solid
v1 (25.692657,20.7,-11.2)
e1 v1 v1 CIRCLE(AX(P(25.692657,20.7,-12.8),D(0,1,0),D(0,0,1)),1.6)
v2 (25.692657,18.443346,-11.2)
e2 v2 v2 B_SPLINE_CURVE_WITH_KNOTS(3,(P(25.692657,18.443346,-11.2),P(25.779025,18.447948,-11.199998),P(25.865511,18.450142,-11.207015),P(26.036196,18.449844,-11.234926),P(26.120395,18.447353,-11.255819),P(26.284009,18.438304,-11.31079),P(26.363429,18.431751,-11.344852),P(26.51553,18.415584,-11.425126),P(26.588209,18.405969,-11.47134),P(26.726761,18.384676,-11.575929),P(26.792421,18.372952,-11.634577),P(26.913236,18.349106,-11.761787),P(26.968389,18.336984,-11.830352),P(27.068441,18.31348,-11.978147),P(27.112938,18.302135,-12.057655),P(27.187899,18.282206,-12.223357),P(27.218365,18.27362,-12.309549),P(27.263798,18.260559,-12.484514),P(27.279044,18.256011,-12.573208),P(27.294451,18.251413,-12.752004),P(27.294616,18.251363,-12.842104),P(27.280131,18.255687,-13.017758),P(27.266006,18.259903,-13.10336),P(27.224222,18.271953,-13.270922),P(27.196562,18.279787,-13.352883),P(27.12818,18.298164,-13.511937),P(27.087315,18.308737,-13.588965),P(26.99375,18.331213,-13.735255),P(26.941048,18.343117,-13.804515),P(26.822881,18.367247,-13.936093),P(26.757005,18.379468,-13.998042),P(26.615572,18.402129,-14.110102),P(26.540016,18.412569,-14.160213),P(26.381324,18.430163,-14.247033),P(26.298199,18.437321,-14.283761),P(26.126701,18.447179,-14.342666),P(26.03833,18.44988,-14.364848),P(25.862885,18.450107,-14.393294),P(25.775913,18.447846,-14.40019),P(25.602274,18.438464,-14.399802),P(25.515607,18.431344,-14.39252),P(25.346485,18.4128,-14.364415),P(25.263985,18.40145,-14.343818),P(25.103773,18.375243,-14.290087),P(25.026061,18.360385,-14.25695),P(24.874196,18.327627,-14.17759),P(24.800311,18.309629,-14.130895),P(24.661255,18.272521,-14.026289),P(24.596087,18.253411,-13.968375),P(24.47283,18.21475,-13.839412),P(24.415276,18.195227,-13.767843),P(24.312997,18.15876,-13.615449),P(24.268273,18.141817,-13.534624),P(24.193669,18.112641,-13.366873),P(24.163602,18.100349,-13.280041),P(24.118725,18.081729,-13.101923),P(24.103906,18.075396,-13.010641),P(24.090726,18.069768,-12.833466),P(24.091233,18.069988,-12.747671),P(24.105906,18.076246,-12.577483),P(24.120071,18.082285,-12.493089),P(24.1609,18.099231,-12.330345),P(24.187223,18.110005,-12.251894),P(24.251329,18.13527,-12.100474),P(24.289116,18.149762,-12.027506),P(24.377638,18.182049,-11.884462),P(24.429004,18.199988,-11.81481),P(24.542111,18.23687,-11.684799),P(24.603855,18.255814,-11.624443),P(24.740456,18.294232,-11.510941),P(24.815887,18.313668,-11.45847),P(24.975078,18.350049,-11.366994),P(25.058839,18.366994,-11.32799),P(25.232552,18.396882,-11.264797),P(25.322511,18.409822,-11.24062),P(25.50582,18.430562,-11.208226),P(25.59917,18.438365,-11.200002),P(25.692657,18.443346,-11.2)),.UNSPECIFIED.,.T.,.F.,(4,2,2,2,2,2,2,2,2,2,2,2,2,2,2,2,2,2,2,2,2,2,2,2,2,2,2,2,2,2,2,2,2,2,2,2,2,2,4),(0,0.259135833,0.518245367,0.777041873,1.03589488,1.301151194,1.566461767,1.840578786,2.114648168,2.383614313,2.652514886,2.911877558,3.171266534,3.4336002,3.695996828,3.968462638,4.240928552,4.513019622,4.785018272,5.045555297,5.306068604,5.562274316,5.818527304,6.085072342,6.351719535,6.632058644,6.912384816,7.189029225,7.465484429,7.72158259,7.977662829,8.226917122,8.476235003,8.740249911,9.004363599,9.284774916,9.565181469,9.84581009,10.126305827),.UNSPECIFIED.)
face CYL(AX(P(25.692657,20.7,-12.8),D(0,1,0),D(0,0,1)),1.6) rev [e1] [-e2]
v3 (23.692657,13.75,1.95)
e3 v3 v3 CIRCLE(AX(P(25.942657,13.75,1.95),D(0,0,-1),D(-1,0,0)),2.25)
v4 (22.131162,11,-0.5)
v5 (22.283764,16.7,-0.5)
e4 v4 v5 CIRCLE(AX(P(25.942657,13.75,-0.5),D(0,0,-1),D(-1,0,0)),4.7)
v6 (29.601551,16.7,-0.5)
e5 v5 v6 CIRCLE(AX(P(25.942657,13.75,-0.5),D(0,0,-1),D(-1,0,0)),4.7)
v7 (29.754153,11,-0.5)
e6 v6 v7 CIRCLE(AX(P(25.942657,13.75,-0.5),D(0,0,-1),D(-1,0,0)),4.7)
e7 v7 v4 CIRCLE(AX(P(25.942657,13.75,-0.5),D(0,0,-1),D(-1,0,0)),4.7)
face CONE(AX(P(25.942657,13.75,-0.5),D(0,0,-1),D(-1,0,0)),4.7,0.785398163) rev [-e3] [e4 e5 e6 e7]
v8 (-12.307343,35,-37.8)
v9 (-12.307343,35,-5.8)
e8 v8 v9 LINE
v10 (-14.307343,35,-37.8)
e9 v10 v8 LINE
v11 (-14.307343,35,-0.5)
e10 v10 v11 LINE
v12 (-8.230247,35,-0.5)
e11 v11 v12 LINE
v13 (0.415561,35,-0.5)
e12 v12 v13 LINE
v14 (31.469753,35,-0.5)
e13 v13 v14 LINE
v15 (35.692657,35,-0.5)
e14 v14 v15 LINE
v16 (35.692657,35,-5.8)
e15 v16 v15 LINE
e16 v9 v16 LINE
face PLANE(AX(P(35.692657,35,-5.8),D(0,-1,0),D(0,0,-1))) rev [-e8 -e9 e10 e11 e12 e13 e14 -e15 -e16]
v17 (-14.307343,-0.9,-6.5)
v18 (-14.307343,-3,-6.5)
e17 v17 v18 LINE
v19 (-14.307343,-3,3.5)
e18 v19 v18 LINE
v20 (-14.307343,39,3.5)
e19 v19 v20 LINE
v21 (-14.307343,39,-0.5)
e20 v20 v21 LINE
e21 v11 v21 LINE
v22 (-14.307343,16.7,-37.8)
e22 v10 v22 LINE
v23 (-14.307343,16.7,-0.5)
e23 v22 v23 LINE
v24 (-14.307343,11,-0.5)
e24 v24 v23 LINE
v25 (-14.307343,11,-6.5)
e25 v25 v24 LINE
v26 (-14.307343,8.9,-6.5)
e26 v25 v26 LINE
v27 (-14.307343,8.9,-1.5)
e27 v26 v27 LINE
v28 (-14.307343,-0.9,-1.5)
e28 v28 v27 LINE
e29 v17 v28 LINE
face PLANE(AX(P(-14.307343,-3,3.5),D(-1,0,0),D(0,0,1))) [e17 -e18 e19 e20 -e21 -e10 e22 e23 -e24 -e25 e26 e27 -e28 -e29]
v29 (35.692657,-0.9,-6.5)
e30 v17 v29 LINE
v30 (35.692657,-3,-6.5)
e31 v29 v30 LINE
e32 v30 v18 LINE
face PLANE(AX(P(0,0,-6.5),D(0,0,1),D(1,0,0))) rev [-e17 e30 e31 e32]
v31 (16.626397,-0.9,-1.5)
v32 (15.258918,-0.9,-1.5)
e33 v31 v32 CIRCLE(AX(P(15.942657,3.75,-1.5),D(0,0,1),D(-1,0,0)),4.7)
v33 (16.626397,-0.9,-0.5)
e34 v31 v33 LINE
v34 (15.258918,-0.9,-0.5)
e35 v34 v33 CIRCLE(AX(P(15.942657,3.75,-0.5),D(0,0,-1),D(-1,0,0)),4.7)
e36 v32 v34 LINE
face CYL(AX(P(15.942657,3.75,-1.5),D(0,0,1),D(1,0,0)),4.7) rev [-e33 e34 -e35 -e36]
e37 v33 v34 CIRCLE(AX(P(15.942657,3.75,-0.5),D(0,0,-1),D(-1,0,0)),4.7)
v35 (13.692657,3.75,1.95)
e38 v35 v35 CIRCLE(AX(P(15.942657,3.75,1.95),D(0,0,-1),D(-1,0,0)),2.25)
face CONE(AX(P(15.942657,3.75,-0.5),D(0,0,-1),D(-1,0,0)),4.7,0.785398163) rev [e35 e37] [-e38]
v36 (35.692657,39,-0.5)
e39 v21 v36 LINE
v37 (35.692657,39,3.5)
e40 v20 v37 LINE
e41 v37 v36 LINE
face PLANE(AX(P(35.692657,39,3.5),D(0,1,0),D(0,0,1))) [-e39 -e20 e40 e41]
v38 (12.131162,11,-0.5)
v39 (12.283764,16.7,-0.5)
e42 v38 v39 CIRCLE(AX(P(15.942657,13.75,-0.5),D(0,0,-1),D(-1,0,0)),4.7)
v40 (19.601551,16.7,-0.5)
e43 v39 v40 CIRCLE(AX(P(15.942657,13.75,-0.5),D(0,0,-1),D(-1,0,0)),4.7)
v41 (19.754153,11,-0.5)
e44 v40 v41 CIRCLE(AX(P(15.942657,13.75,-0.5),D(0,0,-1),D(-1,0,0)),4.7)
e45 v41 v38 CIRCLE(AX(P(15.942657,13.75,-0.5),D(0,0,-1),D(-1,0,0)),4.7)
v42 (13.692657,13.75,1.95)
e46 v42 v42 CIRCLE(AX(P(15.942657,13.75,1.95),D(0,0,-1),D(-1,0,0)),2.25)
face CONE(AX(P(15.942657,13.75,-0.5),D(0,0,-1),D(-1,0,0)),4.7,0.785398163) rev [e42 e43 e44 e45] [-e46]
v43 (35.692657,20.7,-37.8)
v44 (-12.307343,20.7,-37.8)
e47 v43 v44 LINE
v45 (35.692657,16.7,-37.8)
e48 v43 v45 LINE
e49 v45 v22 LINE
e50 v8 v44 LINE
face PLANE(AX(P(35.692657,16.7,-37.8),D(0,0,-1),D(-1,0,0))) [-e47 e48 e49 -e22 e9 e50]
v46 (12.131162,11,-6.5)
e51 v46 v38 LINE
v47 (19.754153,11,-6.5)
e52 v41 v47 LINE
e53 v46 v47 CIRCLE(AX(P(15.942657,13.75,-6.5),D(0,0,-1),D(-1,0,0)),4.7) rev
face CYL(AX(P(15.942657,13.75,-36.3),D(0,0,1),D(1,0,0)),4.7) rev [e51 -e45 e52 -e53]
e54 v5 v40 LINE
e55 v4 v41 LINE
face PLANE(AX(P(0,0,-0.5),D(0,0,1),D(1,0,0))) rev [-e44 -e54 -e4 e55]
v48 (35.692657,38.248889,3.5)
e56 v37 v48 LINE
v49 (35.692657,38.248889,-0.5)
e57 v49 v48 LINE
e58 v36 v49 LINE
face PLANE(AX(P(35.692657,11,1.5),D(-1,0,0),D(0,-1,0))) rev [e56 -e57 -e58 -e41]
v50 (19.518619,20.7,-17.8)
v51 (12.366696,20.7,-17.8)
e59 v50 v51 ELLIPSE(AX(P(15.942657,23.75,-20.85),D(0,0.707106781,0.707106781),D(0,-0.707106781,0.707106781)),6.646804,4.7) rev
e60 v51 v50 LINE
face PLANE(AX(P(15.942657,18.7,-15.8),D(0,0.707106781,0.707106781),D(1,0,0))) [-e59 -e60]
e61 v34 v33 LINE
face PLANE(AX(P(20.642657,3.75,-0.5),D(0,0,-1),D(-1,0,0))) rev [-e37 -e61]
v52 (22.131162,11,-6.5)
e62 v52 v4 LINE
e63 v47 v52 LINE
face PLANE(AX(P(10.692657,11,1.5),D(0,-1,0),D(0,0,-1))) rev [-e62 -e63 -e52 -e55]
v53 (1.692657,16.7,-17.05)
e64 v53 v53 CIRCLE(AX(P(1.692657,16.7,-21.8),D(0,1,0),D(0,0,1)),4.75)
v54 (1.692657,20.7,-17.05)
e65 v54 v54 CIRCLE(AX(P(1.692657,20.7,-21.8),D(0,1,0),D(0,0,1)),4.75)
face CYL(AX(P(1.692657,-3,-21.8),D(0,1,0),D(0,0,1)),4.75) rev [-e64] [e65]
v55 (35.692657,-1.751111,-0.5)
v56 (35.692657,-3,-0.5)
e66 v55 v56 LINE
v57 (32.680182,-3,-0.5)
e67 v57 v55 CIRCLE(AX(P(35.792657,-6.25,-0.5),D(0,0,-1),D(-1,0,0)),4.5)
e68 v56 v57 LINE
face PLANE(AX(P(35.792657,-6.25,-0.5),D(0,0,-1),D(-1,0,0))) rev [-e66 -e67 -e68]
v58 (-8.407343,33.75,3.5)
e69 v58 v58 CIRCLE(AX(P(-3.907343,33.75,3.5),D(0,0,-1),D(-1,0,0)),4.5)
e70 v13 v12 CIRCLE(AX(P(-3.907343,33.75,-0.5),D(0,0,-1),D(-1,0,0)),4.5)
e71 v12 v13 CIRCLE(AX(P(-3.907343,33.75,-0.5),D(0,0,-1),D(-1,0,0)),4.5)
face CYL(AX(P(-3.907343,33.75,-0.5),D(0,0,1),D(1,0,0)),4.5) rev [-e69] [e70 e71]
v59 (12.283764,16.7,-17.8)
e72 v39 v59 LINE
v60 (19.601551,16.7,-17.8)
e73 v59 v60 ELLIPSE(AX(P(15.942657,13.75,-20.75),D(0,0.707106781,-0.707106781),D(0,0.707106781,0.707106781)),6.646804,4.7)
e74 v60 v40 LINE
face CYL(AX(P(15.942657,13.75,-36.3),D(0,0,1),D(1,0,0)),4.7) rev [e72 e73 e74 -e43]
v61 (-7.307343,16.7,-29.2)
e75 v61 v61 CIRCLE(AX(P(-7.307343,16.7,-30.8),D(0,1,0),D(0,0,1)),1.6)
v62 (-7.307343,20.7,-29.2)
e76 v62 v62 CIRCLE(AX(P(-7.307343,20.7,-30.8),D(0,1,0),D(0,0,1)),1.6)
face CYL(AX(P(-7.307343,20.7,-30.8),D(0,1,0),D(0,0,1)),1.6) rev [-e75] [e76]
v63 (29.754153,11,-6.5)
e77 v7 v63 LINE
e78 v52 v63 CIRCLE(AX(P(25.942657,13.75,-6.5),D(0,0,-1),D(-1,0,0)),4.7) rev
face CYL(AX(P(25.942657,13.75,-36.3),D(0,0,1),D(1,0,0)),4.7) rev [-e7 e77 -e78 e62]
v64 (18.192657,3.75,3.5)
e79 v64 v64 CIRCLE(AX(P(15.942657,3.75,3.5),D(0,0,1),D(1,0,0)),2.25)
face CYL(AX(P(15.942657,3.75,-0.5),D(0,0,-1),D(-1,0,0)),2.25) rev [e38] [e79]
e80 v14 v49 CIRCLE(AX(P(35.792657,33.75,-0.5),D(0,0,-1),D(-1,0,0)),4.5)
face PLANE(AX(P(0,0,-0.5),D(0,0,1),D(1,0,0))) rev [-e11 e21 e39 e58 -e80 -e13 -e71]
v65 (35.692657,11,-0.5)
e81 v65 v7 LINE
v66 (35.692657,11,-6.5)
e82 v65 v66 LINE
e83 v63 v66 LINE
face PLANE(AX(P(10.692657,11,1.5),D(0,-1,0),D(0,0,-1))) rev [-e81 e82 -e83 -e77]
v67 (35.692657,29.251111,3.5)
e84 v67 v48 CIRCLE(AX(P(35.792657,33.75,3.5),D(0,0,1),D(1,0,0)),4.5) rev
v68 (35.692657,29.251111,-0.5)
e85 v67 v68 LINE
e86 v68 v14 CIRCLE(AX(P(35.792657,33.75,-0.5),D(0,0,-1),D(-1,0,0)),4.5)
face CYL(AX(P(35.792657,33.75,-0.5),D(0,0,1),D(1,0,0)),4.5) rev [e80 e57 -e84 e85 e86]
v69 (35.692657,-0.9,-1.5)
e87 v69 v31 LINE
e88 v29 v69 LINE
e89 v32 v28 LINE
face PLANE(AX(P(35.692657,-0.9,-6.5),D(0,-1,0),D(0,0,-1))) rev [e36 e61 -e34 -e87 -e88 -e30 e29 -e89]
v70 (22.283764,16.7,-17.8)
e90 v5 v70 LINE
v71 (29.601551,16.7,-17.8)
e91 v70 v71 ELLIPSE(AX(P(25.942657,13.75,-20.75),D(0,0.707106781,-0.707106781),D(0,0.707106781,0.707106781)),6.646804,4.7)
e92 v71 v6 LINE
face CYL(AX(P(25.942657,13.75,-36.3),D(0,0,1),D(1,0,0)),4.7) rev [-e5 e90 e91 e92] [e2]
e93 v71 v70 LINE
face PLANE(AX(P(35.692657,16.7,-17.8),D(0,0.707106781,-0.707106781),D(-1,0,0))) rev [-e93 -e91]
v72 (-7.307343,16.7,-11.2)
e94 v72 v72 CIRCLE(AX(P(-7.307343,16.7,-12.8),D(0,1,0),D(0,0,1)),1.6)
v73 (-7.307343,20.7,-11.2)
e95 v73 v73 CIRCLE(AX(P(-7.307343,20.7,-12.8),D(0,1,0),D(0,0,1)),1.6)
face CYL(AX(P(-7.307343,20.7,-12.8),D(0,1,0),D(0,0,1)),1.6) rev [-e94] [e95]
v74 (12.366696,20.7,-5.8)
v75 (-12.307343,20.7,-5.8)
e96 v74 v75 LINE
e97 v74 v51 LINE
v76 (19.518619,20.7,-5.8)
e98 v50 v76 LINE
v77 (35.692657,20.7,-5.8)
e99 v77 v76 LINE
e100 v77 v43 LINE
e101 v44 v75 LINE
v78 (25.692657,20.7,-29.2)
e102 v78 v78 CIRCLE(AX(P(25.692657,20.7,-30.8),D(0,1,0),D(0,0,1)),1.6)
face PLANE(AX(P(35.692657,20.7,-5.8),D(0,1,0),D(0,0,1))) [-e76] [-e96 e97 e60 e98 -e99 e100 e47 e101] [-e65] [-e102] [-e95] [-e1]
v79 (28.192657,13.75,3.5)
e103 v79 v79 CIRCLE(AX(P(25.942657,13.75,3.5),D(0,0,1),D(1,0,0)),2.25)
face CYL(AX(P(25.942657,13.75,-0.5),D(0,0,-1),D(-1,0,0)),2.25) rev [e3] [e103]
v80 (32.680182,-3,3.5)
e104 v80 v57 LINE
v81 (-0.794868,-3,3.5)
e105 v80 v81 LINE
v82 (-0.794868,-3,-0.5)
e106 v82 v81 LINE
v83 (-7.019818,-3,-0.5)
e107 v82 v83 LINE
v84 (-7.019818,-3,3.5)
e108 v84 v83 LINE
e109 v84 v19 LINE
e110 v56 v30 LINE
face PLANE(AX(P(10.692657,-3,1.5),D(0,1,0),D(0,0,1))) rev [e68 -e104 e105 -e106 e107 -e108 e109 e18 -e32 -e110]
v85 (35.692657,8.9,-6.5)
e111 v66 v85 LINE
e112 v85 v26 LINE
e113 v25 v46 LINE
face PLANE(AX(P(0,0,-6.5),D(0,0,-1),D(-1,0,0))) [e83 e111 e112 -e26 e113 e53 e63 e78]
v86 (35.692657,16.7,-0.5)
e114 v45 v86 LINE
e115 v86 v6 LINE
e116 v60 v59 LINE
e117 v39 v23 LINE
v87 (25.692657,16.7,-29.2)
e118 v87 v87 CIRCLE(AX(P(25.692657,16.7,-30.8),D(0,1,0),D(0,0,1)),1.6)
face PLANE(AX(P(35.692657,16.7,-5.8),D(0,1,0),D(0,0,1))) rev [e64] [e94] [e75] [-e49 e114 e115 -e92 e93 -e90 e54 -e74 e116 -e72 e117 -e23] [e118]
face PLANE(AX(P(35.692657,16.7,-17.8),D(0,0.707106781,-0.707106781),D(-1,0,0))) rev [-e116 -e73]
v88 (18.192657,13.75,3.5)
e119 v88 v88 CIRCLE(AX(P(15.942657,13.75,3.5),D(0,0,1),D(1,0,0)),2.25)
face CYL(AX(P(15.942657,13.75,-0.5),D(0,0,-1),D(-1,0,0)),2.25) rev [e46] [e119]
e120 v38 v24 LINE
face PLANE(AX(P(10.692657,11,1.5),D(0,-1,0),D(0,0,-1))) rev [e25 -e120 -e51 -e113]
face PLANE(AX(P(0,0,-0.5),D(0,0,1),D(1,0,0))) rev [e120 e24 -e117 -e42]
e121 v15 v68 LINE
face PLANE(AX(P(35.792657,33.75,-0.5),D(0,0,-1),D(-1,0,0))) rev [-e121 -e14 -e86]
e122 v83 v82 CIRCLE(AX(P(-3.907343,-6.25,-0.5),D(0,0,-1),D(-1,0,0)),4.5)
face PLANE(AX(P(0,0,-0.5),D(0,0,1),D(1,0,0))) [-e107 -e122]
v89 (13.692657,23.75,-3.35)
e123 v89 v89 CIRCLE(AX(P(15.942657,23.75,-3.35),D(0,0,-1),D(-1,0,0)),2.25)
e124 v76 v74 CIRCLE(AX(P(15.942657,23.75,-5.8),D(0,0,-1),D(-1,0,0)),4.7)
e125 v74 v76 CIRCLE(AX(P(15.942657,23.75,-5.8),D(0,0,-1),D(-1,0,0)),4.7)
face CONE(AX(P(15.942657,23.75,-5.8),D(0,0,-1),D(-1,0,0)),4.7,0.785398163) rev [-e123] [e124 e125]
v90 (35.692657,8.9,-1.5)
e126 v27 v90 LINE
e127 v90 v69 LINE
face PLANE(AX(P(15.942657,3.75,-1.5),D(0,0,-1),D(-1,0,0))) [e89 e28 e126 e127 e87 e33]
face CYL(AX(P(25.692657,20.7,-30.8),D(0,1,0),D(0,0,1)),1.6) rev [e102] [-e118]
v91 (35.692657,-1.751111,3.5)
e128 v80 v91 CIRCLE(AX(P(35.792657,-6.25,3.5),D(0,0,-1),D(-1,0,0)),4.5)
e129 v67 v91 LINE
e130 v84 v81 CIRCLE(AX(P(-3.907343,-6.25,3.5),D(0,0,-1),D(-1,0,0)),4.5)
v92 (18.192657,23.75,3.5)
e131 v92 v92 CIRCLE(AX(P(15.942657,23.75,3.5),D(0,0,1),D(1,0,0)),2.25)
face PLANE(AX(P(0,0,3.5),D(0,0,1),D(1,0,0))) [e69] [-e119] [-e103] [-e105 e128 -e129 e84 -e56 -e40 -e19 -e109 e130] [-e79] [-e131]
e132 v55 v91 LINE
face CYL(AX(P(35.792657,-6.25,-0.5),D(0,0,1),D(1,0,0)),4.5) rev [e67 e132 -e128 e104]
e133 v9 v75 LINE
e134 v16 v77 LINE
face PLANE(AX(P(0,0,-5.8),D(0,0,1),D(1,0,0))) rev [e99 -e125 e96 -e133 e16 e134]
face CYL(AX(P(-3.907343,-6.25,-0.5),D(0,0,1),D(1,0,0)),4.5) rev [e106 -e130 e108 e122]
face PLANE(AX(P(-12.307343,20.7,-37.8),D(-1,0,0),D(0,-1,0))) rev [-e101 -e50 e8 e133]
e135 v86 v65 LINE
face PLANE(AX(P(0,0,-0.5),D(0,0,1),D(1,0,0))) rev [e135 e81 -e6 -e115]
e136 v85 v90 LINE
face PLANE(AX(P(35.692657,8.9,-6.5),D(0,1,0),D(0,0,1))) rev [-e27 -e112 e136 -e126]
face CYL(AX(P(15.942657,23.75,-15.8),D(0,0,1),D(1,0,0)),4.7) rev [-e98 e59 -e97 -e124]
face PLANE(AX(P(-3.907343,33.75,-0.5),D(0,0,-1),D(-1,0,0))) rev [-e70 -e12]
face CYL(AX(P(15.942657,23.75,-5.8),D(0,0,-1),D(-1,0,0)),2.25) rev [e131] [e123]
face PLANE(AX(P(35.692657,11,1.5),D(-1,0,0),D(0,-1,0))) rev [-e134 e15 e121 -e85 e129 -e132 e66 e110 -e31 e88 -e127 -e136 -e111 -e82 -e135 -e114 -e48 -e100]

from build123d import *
from build123d.topology import SkipClean

# Parameters (mm, degrees)
BOSS_EXTRUDE1_START       = 0.5
SKETCH1_W                 = 25
SKETCH1_H                 = 14
BOSS_EXTRUDE1_DEPTH       = 2
SKETCH2_W                 = 25
SKETCH2_H                 = 2.1
BOSS_EXTRUDE2_DEPTH       = 6
SKETCH3_W                 = 50
SKETCH3_H                 = 42
BOSS_EXTRUDE3_DEPTH       = 4
BOSS_EXTRUDE5_START       = -18.3
SKETCH4_2_R               = 1.5
BOSS_EXTRUDE5_DEPTH       = 4
SKETCH5_W                 = 50
SKETCH5_H                 = 18.3
BOSS_EXTRUDE6_DEPTH       = 5.3
SKETCH7_R                 = 4.5
CUT_EXTRUDE1_DEPTH        = 4
SKETCH9_W                 = 35.343646405
SKETCH9_H                 = 8.813303651
CUT_EXTRUDE3_DEPTH        = 10
SKETCH11_R                = 12.5
SKETCH11_R_2              = 1.5
SKETCH11_R_3              = 3.55
BOSS_EXTRUDE7_DEPTH       = 4
SKETCH12_R                = 12.5
BOSS_EXTRUDE8_DEPTH       = 14
SKETCH13_W                = 25
SKETCH13_H                = 2.1
BOSS_EXTRUDE9_DEPTH       = 6
CUT_EXTRUDE2_DEPTH        = 64.84830294
SKETCH14_W                = 9.591087042
SKETCH14_H                = 22.957747356
CUT_EXTRUDE4_DEPTH        = 64.347816028
SKETCH15_W                = 33.975925545
SKETCH15_H                = 18.244219276
CUT_EXTRUDE5_DEPTH        = 62.391693358
SKETCH16_W                = 32
SKETCH16_H                = 4
BOSS_EXTRUDE10_DEPTH      = 50
SKETCH18_W                = 2
SKETCH18_H                = 14.3
BOSS_EXTRUDE11_DEPTH      = 32
CUT_EXTRUDE6_DEPTH        = 58.135766279
F_1_0MM_DOWEL_HOLE1_D     = 3.2
F_1_0MM_DOWEL_HOLE1_DEPTH = 33.03862301
F_1_0MM_DOWEL_HOLE1_TIP   = 0.96137699
BOSS_EXTRUDE12_DEPTH      = 1
CUT_EXTRUDE7_DEPTH        = 10
CHAMFER1_SIZE             = 2


# Read off the part's stored shape, not the designer's step: CSK for M4 Flat Head Machine Screw1
with BuildPart() as part:
    # Sketch1 → Boss-Extrude1 (new body)
    with BuildSketch(Plane.XY.offset(-1).offset(BOSS_EXTRUDE1_START)):
        with Locations((23.192657344, 4)):
            Rectangle(SKETCH1_W, SKETCH1_H)
    extrude(amount=BOSS_EXTRUDE1_DEPTH)

    # Sketch2 → Boss-Extrude2 (add)
    with BuildSketch(Plane(origin=(0, 0, -0.5), x_dir=(-1, 0, 0), z_dir=(0, 0, -1))):
        with Locations((-23.192657344, 9.95)):
            Rectangle(SKETCH2_W, SKETCH2_H)
        with Locations((-23.192657344, -1.95)):
            Rectangle(SKETCH2_W, SKETCH2_H)
    extrude(amount=BOSS_EXTRUDE2_DEPTH)

    # Sketch3 → Boss-Extrude3 (add)
    with BuildSketch(Plane(origin=(0, 0, -0.5), x_dir=(-1, 0, 0), z_dir=(0, 0, -1))):
        with Locations((-10.692657344, 18)):
            Rectangle(SKETCH3_W, SKETCH3_H)
    extrude(amount=-BOSS_EXTRUDE3_DEPTH)

    # Sketch4<2> → Boss-Extrude5 (add)
    with BuildSketch(Plane(origin=(0, 35, 0), x_dir=(1, 0, 0), z_dir=(0, 1, 0)).offset(BOSS_EXTRUDE5_START)):
        with BuildLine():
            Line((-1.349302764, 24.5), (-1.349302764, 0.5))
            Line((-1.349302764, 0.5), (8.650697236, 0.5))
            Line((8.650697236, 0.5), (8.650697236, 24.5))
            ThreePointArc((8.650697236, 24.5), (3.650697236, 29.5), (-1.349302764, 24.5))
        make_face()
        with Locations(Location((3.650697236, 7.5, 0), (0, 0, 270))):
            Circle(SKETCH4_2_R, mode=Mode.SUBTRACT)
        with Locations(Location((3.650697236, 24.5, 0), (0, 0, 270))):
            Circle(SKETCH4_2_R, mode=Mode.SUBTRACT)
    extrude(amount=-BOSS_EXTRUDE5_DEPTH)

    # Sketch5 → Boss-Extrude6 (add)
    with BuildSketch(Plane(origin=(0, 0, -0.5), x_dir=(-1, 0, 0), z_dir=(0, 0, -1))):
        with Locations((-10.692657344, 25.85)):
            Rectangle(SKETCH5_W, SKETCH5_H)
    extrude(amount=BOSS_EXTRUDE6_DEPTH)

    # CSK for M4 Flat Head Machine Screw1 outl → CSK for M4 Flat Head Machine Screw1 (revolve, cut)
    with BuildSketch(Plane(origin=(15.942657344, 23.75, 0), x_dir=(1, 0, 0), z_dir=(0, -1, 0))):
        Polygon((2.25, -3.35), (2.25, 3.5), (0, 3.5), (0, -5.8), (4.7, -5.8), align=None)
    revolve(axis=Axis((15.942657344, 23.75, 0), (0, 0, 1)), mode=Mode.SUBTRACT)

    # CSK for M4 Flat Head Machine Screw1 2 ou → CSK for M4 Flat Head Machine Screw1 2 (revolve, cut)
    with BuildSketch(Plane(origin=(15.942657344, 3.75, 0), x_dir=(1, 0, 0), z_dir=(0, -1, 0))):
        Polygon((4.7, -0.5), (2.25, 1.95), (2.25, 3.5), (0, 3.5), (0, -0.5), align=None)
    revolve(axis=Axis((15.942657344, 3.75, 0), (0, 0, 1)), mode=Mode.SUBTRACT)

    # CSK for M4 Flat Head Machine Screw1 3 ou → CSK for M4 Flat Head Machine Screw1 3 (revolve, cut)
    with BuildSketch(Plane(origin=(15.942657344, 13.75, 0), x_dir=(1, 0, 0), z_dir=(0, -1, 0))):
        Polygon((4.7, -0.5), (2.25, 1.95), (2.25, 3.5), (0, 3.5), (0, -0.5), align=None)
    revolve(axis=Axis((15.942657344, 13.75, 0), (0, 0, 1)), mode=Mode.SUBTRACT)

    # CSK for M4 Flat Head Machine Screw1 4 ou → CSK for M4 Flat Head Machine Screw1 4 (revolve, cut)
    with BuildSketch(Plane(origin=(25.942657344, 13.75, 0), x_dir=(1, 0, 0), z_dir=(0, -1, 0))):
        Polygon((2.25, 1.95), (2.25, 3.5), (0, 3.5), (0, -0.5), (4.7, -0.5), align=None)
    revolve(axis=Axis((25.942657344, 13.75, 0), (0, 0, 1)), mode=Mode.SUBTRACT)

    # Sketch7 → Cut-Extrude1 (cut)
    with BuildSketch(Plane(origin=(0, 0, 3.5), x_dir=(-1, 0, 0), z_dir=(0, 0, -1))):
        with Locations((-35.792657344, 33.75)):
            Circle(SKETCH7_R)
        with Locations(Location((3.907342656, 33.75, 0), (0, 0, 163.872379787))):
            Circle(SKETCH7_R)
        with Locations((3.907342656, -6.25)):
            Circle(SKETCH7_R)
        with Locations((-35.792657344, -6.25)):
            Circle(SKETCH7_R)
    extrude(amount=CUT_EXTRUDE1_DEPTH, mode=Mode.SUBTRACT)

    # Sketch9 → Cut-Extrude3 (cut)
    with BuildSketch(Plane.ZY.offset(1.349302764)):
        with Locations((-18.171823203, 12.293348175)):
            Rectangle(SKETCH9_W, SKETCH9_H)
    extrude(amount=-CUT_EXTRUDE3_DEPTH, mode=Mode.SUBTRACT)

    # Sketch11 → Boss-Extrude7 (add)
    # profile 1 of 4: a face of its own
    with BuildSketch(Plane.XZ.offset(-16.7)):
        with BuildLine():
            Line((-3.212467494, -5.8), (-14.307342656, -5.8))
            Line((-14.307342656, -5.8), (-14.807342656, -5.8))
            Line((-14.807342656, -5.8), (-14.807342656, -20.8))
            ThreePointArc((-14.807342656, -20.8), (-11.570691199, -11.320533638), (-3.212467494, -5.8))
        make_face()
    # profile 2 of 4: a face of its own
    with BuildSketch(Plane.XZ.offset(-16.7)):
        with BuildLine():
            Line((4.597782182, -5.8), (-3.212467494, -5.8))
            ThreePointArc((-3.212467494, -5.8), (-11.570691199, -11.320533638), (-14.807342656, -20.8))
            ThreePointArc((-14.807342656, -20.8), (0.692657344, -36.3), (16.192657344, -20.8))
            ThreePointArc((16.192657344, -20.8), (12.956005887, -11.320533638), (4.597782182, -5.8))
        make_face()
        with Locations((0.692657344, -20.8)):
            Circle(SKETCH11_R, mode=Mode.SUBTRACT)
    # profile 3 of 4: a face of its own
    with BuildSketch(Plane.XZ.offset(-16.7)):
        with Locations((0.692657344, -20.8)):
            Circle(SKETCH11_R)
        with Locations(Location((0.692657344, -12.3, 0), (0, 0, 270))):
            Circle(SKETCH11_R_2, mode=Mode.SUBTRACT)
        with Locations(Location((0.692657344, -20.8, 0), (0, 0, 270))):
            Circle(SKETCH11_R_3, mode=Mode.SUBTRACT)
        with Locations(Location((9.192657344, -20.8, 0), (0, 0, 270))):
            Circle(SKETCH11_R_2, mode=Mode.SUBTRACT)
        with Locations(Location((0.692657344, -29.3, 0), (0, 0, 270))):
            Circle(SKETCH11_R_2, mode=Mode.SUBTRACT)
        with Locations(Location((-7.807342656, -20.8, 0), (0, 0, 270))):
            Circle(SKETCH11_R_2, mode=Mode.SUBTRACT)
    # profile 4 of 4: a face of its own
    with BuildSketch(Plane.XZ.offset(-16.7)):
        with BuildLine():
            Line((16.192657344, -5.8), (4.597782182, -5.8))
            ThreePointArc((4.597782182, -5.8), (12.956005887, -11.320533638), (16.192657344, -20.8))
            Line((16.192657344, -20.8), (16.192657344, -5.8))
        make_face()
    extrude(amount=-BOSS_EXTRUDE7_DEPTH)

    # Sketch12 → Boss-Extrude8 (add)
    with SkipClean():  # the faces are left unmerged after this step: merging them gives an invalid solid
        with BuildSketch(Plane(origin=(0, 20.7, 0), x_dir=(1, 0, 0), z_dir=(0, 1, 0))):
            with BuildLine():
                Line((-14.807342656, 20.8), (-14.807342656, 5.8))
                Line((-14.807342656, 5.8), (16.192657344, 5.8))
                Line((16.192657344, 5.8), (16.192657344, 20.8))
                ThreePointArc((16.192657344, 20.8), (0.692657344, 36.3), (-14.807342656, 20.8))
            make_face()
            with Locations(Location((0.692657344, 20.8, 0), (0, 0, 270))):
                Circle(SKETCH12_R, mode=Mode.SUBTRACT)
        extrude(amount=BOSS_EXTRUDE8_DEPTH)

    # Sketch13 → Boss-Extrude9 (add)
    with SkipClean():  # the faces are left unmerged after this step: merging them gives an invalid solid
        with BuildSketch(Plane(origin=(0, 0, -0.5), x_dir=(-1, 0, 0), z_dir=(0, 0, -1))):
            with Locations((1.807342656, 9.95)):
                Rectangle(SKETCH13_W, SKETCH13_H)
            with Locations((1.807342656, -1.95)):
                Rectangle(SKETCH13_W, SKETCH13_H)
        extrude(amount=BOSS_EXTRUDE9_DEPTH)

    # Sketch8 → Cut-Extrude2 (cut, through all)
    with SkipClean():  # the faces are left unmerged after this step: merging them gives an invalid solid
        with BuildSketch(Plane(origin=(0, 0, -0.5), x_dir=(-1, 0, 0), z_dir=(0, 0, -1))):
            with BuildLine():
                ThreePointArc((-12.283764069, 16.7), (-15.942657344, 18.45), (-19.601550619, 16.7))
                ThreePointArc((-19.601550619, 16.7), (-20.640973864, 13.875785056), (-19.754153113, 11))
                ThreePointArc((-19.754153113, 11), (-15.942657344, 9.05), (-12.131161575, 11))
                ThreePointArc((-12.131161575, 11), (-11.244340824, 13.875785056), (-12.283764069, 16.7))
            make_face()
            with BuildLine():
                ThreePointArc((-22.283764069, 16.7), (-25.942657344, 18.45), (-29.601550619, 16.7))
                ThreePointArc((-29.601550619, 16.7), (-30.640973864, 13.875785056), (-29.754153113, 11))
                ThreePointArc((-29.754153113, 11), (-25.942657344, 9.05), (-22.131161575, 11))
                ThreePointArc((-22.131161575, 11), (-21.244340824, 13.875785056), (-22.283764069, 16.7))
            make_face()
        extrude(amount=CUT_EXTRUDE2_DEPTH, mode=Mode.SUBTRACT)

    # Sketch14 → Cut-Extrude4 (cut, through all)
    with SkipClean():  # the faces are left unmerged after this step: merging them gives an invalid solid
        with BuildSketch(Plane(origin=(0, 34.7, 0), x_dir=(1, 0, 0), z_dir=(0, 1, 0))):
            with Locations((-19.102886177, 17.278873678)):
                Rectangle(SKETCH14_W, SKETCH14_H)
        extrude(amount=-CUT_EXTRUDE4_DEPTH, mode=Mode.SUBTRACT)

    # Sketch15 → Cut-Extrude5 (cut, through all)
    with BuildSketch(Plane(origin=(16.192657344, 0, 0), x_dir=(0, 0, -1), z_dir=(1, 0, 0))):
        with Locations((22.787962773, 25.822109638)):
            Rectangle(SKETCH15_W, SKETCH15_H)
    extrude(amount=-CUT_EXTRUDE5_DEPTH, mode=Mode.SUBTRACT)

    # Sketch16 → Boss-Extrude10 (add, through all)
    with BuildSketch(Plane.ZY.offset(14.307342656)):
        with Locations((-21.8, 18.7)):
            Rectangle(SKETCH16_W, SKETCH16_H)
    extrude(amount=-BOSS_EXTRUDE10_DEPTH)

    # Sketch18 → Boss-Extrude11 (add, through all)
    with BuildSketch(Plane(origin=(0, 0, -5.8), x_dir=(-1, 0, 0), z_dir=(0, 0, -1))):
        with Locations((13.307342656, 27.85)):
            Rectangle(SKETCH18_W, SKETCH18_H)
    extrude(amount=BOSS_EXTRUDE11_DEPTH)

    # Sketch19 → Cut-Extrude6 (cut, through all)
    with BuildSketch(Plane(origin=(0, 20.7, 0), x_dir=(1, 0, 0), z_dir=(0, 1, 0))):
        with BuildLine():
            ThreePointArc((3.376188065, 17.358353423), (6.134303921, 23.483530721), (0.009126623, 26.241646577))
            ThreePointArc((0.009126623, 26.241646577), (-2.748989233, 20.116469279), (3.376188065, 17.358353423))
        make_face()
    extrude(amount=-CUT_EXTRUDE6_DEPTH, mode=Mode.SUBTRACT)

    # Ø1.0mm Dowel Hole1
    with Locations(Plane(origin=(-7.307342656, 20.7, -30.8), x_dir=(0, 0, 1), z_dir=(0, 1, 0))):
        with Locations((0, 0), (18, 0), (18, 33), (0, 33)):
            Hole(F_1_0MM_DOWEL_HOLE1_D / 2, depth=F_1_0MM_DOWEL_HOLE1_DEPTH)
            with Locations((0, 0, -(F_1_0MM_DOWEL_HOLE1_DEPTH + F_1_0MM_DOWEL_HOLE1_TIP / 2))):  # 118° drill point
                Cone(0, F_1_0MM_DOWEL_HOLE1_D / 2, F_1_0MM_DOWEL_HOLE1_TIP, mode=Mode.SUBTRACT)

    # Sketch21 → Boss-Extrude12 (add)
    with BuildSketch(Plane(origin=(0, 0, -0.5), x_dir=(-1, 0, 0), z_dir=(0, 0, -1))):
        with BuildLine():
            Line((-15.258917627, -0.9), (14.307342656, -0.9))
            Line((14.307342656, -0.9), (14.307342656, 8.9))
            Line((14.307342656, 8.9), (-35.692657344, 8.9))
            Line((-35.692657344, 8.9), (-35.692657344, -0.9))
            Line((-35.692657344, -0.9), (-16.626397061, -0.9))
            ThreePointArc((-16.626397061, -0.9), (-15.942657344, 8.45), (-15.258917627, -0.9))
        make_face()
    extrude(amount=BOSS_EXTRUDE12_DEPTH)

    # Sketch22 → Cut-Extrude7 (cut)
    with BuildSketch(Plane(origin=(0, 0, -5.8), x_dir=(-1, 0, 0), z_dir=(0, 0, -1))):
        with BuildLine():
            ThreePointArc((-22.283764069, 16.7), (-25.942657344, 18.45), (-29.601550619, 16.7))
            ThreePointArc((-29.601550619, 16.7), (-30.640973864, 13.875785056), (-29.754153113, 11))
            ThreePointArc((-29.754153113, 11), (-25.942657344, 9.05), (-22.131161575, 11))
            ThreePointArc((-22.131161575, 11), (-21.244340824, 13.875785056), (-22.283764069, 16.7))
        make_face()
        with BuildLine():
            ThreePointArc((-12.283764069, 16.7), (-15.942657344, 18.45), (-19.601550619, 16.7))
            ThreePointArc((-19.601550619, 16.7), (-20.640973864, 13.875785056), (-19.754153113, 11))
            ThreePointArc((-19.754153113, 11), (-15.942657344, 9.05), (-12.131161575, 11))
            ThreePointArc((-12.131161575, 11), (-11.244340824, 13.875785056), (-12.283764069, 16.7))
        make_face()
        with BuildLine():
            ThreePointArc((-19.518618753, 20.7), (-15.942657344, 19.05), (-12.366695935, 20.7))
            ThreePointArc((-12.366695935, 20.7), (-15.942657344, 28.45), (-19.518618753, 20.7))
        make_face()
    extrude(amount=CUT_EXTRUDE7_DEPTH, mode=Mode.SUBTRACT)

    # Chamfer1
    # the kernel refuses this chamfer: 2 mm, written as the material it takes off along each edge
    with BuildSketch(Plane(origin=(7.223329959, 20.7, -15.8), x_dir=(0, -0.9996219169112968, 0.02749587661058651), z_dir=(1, 0, 0))) as chamfer1_piece_1_section:
        Polygon((CHAMFER1_SIZE * 0.999621916911, CHAMFER1_SIZE * 0.0274958766106), (-CHAMFER1_SIZE * 0.0274958766106, CHAMFER1_SIZE * 0.999621916911), (0, 0), align=None)
    chamfer1_piece_1 = extrude(amount=17.43865477, mode=Mode.PRIVATE)
    chamfer1_piece_1 = chamfer1_piece_1 & Plane(origin=(15.942657344, 23.75, -16.543684423), x_dir=(0.7608428530186694, -0.6489361702127657, 0), z_dir=(0, 0, 1)) * Cylinder(4.7, 43, mode=Mode.PRIVATE)
    add(chamfer1_piece_1, mode=Mode.SUBTRACT)
    with BuildSketch(Plane(origin=(24.744916595, 16.7, -15.8), x_dir=(0, 0.9996219169112968, 0.02749587661058651), z_dir=(-1, 0, 0))) as chamfer1_piece_2_section:
        Polygon((CHAMFER1_SIZE * 0.999621916911, CHAMFER1_SIZE * 0.0274958766106), (-CHAMFER1_SIZE * 0.0274958766106, CHAMFER1_SIZE * 0.999621916911), (0, 0), align=None)
    chamfer1_piece_2 = extrude(amount=17.604518502, mode=Mode.PRIVATE)
    chamfer1_piece_2 = chamfer1_piece_2 & Plane(origin=(25.942657344, 13.75, -16.56864212), x_dir=(-0.8109565466765494, -0.5851063829787245, 0), z_dir=(0, 0, 1)) * Cylinder(4.7, 44, mode=Mode.PRIVATE)
    add(chamfer1_piece_2, mode=Mode.SUBTRACT)
    with BuildSketch(Plane(origin=(24.744916595, 16.7, -15.8), x_dir=(0, 0.9996219169112968, 0.02749587661058651), z_dir=(-1, 0, 0))) as chamfer1_piece_3_section:
        Polygon((CHAMFER1_SIZE * 0.999621916911, CHAMFER1_SIZE * 0.0274958766106), (-CHAMFER1_SIZE * 0.0274958766106, CHAMFER1_SIZE * 0.999621916911), (0, 0), align=None)
    chamfer1_piece_3 = extrude(amount=17.604518502, mode=Mode.PRIVATE)
    chamfer1_piece_3 = chamfer1_piece_3 & Plane(origin=(15.942657344, 13.75, -16.53312589), x_dir=(-0.7784879309138604, 0.6276595744680842, 0), z_dir=(0, 0, 1)) * Cylinder(4.7, 44, mode=Mode.PRIVATE)
    add(chamfer1_piece_3, mode=Mode.SUBTRACT)
    with BuildSketch(Plane(origin=(34.744916595, 16.7, -15.8), x_dir=(0, 0.9996219169112968, 0.02749587661058651), z_dir=(-1, 0, 0))) as chamfer1_piece_4_section:
        Polygon((CHAMFER1_SIZE * 0.999621916911, CHAMFER1_SIZE * 0.0274958766106), (-CHAMFER1_SIZE * 0.0274958766106, CHAMFER1_SIZE * 0.999621916911), (0, 0), align=None)
    chamfer1_piece_4 = extrude(amount=17.604518502, mode=Mode.PRIVATE)
    chamfer1_piece_4 = chamfer1_piece_4 & Plane(origin=(25.942657344, 13.75, -16.533125893), x_dir=(-0.8109565466765494, -0.5851063829787245, 0), z_dir=(0, 0, 1)) * Cylinder(4.7, 44, mode=Mode.PRIVATE)
    add(chamfer1_piece_4, mode=Mode.SUBTRACT)
    with BuildSketch(Plane(origin=(34.744916595, 16.7, -15.8), x_dir=(0, 0.9996219169112968, 0.02749587661058651), z_dir=(-1, 0, 0))) as chamfer1_piece_5_section:
        Polygon((CHAMFER1_SIZE * 0.999621916911, CHAMFER1_SIZE * 0.0274958766106), (-CHAMFER1_SIZE * 0.0274958766106, CHAMFER1_SIZE * 0.999621916911), (0, 0), align=None)
    chamfer1_piece_5 = extrude(amount=17.604518502, mode=Mode.PRIVATE)
    chamfer1_piece_5 = chamfer1_piece_5 & Plane(origin=(15.942657344, 13.75, -16.568642119), x_dir=(-0.7784879309138604, 0.6276595744680842, 0), z_dir=(0, 0, 1)) * Cylinder(4.7, 44, mode=Mode.PRIVATE)
    add(chamfer1_piece_5, mode=Mode.SUBTRACT)


solid = part.part
